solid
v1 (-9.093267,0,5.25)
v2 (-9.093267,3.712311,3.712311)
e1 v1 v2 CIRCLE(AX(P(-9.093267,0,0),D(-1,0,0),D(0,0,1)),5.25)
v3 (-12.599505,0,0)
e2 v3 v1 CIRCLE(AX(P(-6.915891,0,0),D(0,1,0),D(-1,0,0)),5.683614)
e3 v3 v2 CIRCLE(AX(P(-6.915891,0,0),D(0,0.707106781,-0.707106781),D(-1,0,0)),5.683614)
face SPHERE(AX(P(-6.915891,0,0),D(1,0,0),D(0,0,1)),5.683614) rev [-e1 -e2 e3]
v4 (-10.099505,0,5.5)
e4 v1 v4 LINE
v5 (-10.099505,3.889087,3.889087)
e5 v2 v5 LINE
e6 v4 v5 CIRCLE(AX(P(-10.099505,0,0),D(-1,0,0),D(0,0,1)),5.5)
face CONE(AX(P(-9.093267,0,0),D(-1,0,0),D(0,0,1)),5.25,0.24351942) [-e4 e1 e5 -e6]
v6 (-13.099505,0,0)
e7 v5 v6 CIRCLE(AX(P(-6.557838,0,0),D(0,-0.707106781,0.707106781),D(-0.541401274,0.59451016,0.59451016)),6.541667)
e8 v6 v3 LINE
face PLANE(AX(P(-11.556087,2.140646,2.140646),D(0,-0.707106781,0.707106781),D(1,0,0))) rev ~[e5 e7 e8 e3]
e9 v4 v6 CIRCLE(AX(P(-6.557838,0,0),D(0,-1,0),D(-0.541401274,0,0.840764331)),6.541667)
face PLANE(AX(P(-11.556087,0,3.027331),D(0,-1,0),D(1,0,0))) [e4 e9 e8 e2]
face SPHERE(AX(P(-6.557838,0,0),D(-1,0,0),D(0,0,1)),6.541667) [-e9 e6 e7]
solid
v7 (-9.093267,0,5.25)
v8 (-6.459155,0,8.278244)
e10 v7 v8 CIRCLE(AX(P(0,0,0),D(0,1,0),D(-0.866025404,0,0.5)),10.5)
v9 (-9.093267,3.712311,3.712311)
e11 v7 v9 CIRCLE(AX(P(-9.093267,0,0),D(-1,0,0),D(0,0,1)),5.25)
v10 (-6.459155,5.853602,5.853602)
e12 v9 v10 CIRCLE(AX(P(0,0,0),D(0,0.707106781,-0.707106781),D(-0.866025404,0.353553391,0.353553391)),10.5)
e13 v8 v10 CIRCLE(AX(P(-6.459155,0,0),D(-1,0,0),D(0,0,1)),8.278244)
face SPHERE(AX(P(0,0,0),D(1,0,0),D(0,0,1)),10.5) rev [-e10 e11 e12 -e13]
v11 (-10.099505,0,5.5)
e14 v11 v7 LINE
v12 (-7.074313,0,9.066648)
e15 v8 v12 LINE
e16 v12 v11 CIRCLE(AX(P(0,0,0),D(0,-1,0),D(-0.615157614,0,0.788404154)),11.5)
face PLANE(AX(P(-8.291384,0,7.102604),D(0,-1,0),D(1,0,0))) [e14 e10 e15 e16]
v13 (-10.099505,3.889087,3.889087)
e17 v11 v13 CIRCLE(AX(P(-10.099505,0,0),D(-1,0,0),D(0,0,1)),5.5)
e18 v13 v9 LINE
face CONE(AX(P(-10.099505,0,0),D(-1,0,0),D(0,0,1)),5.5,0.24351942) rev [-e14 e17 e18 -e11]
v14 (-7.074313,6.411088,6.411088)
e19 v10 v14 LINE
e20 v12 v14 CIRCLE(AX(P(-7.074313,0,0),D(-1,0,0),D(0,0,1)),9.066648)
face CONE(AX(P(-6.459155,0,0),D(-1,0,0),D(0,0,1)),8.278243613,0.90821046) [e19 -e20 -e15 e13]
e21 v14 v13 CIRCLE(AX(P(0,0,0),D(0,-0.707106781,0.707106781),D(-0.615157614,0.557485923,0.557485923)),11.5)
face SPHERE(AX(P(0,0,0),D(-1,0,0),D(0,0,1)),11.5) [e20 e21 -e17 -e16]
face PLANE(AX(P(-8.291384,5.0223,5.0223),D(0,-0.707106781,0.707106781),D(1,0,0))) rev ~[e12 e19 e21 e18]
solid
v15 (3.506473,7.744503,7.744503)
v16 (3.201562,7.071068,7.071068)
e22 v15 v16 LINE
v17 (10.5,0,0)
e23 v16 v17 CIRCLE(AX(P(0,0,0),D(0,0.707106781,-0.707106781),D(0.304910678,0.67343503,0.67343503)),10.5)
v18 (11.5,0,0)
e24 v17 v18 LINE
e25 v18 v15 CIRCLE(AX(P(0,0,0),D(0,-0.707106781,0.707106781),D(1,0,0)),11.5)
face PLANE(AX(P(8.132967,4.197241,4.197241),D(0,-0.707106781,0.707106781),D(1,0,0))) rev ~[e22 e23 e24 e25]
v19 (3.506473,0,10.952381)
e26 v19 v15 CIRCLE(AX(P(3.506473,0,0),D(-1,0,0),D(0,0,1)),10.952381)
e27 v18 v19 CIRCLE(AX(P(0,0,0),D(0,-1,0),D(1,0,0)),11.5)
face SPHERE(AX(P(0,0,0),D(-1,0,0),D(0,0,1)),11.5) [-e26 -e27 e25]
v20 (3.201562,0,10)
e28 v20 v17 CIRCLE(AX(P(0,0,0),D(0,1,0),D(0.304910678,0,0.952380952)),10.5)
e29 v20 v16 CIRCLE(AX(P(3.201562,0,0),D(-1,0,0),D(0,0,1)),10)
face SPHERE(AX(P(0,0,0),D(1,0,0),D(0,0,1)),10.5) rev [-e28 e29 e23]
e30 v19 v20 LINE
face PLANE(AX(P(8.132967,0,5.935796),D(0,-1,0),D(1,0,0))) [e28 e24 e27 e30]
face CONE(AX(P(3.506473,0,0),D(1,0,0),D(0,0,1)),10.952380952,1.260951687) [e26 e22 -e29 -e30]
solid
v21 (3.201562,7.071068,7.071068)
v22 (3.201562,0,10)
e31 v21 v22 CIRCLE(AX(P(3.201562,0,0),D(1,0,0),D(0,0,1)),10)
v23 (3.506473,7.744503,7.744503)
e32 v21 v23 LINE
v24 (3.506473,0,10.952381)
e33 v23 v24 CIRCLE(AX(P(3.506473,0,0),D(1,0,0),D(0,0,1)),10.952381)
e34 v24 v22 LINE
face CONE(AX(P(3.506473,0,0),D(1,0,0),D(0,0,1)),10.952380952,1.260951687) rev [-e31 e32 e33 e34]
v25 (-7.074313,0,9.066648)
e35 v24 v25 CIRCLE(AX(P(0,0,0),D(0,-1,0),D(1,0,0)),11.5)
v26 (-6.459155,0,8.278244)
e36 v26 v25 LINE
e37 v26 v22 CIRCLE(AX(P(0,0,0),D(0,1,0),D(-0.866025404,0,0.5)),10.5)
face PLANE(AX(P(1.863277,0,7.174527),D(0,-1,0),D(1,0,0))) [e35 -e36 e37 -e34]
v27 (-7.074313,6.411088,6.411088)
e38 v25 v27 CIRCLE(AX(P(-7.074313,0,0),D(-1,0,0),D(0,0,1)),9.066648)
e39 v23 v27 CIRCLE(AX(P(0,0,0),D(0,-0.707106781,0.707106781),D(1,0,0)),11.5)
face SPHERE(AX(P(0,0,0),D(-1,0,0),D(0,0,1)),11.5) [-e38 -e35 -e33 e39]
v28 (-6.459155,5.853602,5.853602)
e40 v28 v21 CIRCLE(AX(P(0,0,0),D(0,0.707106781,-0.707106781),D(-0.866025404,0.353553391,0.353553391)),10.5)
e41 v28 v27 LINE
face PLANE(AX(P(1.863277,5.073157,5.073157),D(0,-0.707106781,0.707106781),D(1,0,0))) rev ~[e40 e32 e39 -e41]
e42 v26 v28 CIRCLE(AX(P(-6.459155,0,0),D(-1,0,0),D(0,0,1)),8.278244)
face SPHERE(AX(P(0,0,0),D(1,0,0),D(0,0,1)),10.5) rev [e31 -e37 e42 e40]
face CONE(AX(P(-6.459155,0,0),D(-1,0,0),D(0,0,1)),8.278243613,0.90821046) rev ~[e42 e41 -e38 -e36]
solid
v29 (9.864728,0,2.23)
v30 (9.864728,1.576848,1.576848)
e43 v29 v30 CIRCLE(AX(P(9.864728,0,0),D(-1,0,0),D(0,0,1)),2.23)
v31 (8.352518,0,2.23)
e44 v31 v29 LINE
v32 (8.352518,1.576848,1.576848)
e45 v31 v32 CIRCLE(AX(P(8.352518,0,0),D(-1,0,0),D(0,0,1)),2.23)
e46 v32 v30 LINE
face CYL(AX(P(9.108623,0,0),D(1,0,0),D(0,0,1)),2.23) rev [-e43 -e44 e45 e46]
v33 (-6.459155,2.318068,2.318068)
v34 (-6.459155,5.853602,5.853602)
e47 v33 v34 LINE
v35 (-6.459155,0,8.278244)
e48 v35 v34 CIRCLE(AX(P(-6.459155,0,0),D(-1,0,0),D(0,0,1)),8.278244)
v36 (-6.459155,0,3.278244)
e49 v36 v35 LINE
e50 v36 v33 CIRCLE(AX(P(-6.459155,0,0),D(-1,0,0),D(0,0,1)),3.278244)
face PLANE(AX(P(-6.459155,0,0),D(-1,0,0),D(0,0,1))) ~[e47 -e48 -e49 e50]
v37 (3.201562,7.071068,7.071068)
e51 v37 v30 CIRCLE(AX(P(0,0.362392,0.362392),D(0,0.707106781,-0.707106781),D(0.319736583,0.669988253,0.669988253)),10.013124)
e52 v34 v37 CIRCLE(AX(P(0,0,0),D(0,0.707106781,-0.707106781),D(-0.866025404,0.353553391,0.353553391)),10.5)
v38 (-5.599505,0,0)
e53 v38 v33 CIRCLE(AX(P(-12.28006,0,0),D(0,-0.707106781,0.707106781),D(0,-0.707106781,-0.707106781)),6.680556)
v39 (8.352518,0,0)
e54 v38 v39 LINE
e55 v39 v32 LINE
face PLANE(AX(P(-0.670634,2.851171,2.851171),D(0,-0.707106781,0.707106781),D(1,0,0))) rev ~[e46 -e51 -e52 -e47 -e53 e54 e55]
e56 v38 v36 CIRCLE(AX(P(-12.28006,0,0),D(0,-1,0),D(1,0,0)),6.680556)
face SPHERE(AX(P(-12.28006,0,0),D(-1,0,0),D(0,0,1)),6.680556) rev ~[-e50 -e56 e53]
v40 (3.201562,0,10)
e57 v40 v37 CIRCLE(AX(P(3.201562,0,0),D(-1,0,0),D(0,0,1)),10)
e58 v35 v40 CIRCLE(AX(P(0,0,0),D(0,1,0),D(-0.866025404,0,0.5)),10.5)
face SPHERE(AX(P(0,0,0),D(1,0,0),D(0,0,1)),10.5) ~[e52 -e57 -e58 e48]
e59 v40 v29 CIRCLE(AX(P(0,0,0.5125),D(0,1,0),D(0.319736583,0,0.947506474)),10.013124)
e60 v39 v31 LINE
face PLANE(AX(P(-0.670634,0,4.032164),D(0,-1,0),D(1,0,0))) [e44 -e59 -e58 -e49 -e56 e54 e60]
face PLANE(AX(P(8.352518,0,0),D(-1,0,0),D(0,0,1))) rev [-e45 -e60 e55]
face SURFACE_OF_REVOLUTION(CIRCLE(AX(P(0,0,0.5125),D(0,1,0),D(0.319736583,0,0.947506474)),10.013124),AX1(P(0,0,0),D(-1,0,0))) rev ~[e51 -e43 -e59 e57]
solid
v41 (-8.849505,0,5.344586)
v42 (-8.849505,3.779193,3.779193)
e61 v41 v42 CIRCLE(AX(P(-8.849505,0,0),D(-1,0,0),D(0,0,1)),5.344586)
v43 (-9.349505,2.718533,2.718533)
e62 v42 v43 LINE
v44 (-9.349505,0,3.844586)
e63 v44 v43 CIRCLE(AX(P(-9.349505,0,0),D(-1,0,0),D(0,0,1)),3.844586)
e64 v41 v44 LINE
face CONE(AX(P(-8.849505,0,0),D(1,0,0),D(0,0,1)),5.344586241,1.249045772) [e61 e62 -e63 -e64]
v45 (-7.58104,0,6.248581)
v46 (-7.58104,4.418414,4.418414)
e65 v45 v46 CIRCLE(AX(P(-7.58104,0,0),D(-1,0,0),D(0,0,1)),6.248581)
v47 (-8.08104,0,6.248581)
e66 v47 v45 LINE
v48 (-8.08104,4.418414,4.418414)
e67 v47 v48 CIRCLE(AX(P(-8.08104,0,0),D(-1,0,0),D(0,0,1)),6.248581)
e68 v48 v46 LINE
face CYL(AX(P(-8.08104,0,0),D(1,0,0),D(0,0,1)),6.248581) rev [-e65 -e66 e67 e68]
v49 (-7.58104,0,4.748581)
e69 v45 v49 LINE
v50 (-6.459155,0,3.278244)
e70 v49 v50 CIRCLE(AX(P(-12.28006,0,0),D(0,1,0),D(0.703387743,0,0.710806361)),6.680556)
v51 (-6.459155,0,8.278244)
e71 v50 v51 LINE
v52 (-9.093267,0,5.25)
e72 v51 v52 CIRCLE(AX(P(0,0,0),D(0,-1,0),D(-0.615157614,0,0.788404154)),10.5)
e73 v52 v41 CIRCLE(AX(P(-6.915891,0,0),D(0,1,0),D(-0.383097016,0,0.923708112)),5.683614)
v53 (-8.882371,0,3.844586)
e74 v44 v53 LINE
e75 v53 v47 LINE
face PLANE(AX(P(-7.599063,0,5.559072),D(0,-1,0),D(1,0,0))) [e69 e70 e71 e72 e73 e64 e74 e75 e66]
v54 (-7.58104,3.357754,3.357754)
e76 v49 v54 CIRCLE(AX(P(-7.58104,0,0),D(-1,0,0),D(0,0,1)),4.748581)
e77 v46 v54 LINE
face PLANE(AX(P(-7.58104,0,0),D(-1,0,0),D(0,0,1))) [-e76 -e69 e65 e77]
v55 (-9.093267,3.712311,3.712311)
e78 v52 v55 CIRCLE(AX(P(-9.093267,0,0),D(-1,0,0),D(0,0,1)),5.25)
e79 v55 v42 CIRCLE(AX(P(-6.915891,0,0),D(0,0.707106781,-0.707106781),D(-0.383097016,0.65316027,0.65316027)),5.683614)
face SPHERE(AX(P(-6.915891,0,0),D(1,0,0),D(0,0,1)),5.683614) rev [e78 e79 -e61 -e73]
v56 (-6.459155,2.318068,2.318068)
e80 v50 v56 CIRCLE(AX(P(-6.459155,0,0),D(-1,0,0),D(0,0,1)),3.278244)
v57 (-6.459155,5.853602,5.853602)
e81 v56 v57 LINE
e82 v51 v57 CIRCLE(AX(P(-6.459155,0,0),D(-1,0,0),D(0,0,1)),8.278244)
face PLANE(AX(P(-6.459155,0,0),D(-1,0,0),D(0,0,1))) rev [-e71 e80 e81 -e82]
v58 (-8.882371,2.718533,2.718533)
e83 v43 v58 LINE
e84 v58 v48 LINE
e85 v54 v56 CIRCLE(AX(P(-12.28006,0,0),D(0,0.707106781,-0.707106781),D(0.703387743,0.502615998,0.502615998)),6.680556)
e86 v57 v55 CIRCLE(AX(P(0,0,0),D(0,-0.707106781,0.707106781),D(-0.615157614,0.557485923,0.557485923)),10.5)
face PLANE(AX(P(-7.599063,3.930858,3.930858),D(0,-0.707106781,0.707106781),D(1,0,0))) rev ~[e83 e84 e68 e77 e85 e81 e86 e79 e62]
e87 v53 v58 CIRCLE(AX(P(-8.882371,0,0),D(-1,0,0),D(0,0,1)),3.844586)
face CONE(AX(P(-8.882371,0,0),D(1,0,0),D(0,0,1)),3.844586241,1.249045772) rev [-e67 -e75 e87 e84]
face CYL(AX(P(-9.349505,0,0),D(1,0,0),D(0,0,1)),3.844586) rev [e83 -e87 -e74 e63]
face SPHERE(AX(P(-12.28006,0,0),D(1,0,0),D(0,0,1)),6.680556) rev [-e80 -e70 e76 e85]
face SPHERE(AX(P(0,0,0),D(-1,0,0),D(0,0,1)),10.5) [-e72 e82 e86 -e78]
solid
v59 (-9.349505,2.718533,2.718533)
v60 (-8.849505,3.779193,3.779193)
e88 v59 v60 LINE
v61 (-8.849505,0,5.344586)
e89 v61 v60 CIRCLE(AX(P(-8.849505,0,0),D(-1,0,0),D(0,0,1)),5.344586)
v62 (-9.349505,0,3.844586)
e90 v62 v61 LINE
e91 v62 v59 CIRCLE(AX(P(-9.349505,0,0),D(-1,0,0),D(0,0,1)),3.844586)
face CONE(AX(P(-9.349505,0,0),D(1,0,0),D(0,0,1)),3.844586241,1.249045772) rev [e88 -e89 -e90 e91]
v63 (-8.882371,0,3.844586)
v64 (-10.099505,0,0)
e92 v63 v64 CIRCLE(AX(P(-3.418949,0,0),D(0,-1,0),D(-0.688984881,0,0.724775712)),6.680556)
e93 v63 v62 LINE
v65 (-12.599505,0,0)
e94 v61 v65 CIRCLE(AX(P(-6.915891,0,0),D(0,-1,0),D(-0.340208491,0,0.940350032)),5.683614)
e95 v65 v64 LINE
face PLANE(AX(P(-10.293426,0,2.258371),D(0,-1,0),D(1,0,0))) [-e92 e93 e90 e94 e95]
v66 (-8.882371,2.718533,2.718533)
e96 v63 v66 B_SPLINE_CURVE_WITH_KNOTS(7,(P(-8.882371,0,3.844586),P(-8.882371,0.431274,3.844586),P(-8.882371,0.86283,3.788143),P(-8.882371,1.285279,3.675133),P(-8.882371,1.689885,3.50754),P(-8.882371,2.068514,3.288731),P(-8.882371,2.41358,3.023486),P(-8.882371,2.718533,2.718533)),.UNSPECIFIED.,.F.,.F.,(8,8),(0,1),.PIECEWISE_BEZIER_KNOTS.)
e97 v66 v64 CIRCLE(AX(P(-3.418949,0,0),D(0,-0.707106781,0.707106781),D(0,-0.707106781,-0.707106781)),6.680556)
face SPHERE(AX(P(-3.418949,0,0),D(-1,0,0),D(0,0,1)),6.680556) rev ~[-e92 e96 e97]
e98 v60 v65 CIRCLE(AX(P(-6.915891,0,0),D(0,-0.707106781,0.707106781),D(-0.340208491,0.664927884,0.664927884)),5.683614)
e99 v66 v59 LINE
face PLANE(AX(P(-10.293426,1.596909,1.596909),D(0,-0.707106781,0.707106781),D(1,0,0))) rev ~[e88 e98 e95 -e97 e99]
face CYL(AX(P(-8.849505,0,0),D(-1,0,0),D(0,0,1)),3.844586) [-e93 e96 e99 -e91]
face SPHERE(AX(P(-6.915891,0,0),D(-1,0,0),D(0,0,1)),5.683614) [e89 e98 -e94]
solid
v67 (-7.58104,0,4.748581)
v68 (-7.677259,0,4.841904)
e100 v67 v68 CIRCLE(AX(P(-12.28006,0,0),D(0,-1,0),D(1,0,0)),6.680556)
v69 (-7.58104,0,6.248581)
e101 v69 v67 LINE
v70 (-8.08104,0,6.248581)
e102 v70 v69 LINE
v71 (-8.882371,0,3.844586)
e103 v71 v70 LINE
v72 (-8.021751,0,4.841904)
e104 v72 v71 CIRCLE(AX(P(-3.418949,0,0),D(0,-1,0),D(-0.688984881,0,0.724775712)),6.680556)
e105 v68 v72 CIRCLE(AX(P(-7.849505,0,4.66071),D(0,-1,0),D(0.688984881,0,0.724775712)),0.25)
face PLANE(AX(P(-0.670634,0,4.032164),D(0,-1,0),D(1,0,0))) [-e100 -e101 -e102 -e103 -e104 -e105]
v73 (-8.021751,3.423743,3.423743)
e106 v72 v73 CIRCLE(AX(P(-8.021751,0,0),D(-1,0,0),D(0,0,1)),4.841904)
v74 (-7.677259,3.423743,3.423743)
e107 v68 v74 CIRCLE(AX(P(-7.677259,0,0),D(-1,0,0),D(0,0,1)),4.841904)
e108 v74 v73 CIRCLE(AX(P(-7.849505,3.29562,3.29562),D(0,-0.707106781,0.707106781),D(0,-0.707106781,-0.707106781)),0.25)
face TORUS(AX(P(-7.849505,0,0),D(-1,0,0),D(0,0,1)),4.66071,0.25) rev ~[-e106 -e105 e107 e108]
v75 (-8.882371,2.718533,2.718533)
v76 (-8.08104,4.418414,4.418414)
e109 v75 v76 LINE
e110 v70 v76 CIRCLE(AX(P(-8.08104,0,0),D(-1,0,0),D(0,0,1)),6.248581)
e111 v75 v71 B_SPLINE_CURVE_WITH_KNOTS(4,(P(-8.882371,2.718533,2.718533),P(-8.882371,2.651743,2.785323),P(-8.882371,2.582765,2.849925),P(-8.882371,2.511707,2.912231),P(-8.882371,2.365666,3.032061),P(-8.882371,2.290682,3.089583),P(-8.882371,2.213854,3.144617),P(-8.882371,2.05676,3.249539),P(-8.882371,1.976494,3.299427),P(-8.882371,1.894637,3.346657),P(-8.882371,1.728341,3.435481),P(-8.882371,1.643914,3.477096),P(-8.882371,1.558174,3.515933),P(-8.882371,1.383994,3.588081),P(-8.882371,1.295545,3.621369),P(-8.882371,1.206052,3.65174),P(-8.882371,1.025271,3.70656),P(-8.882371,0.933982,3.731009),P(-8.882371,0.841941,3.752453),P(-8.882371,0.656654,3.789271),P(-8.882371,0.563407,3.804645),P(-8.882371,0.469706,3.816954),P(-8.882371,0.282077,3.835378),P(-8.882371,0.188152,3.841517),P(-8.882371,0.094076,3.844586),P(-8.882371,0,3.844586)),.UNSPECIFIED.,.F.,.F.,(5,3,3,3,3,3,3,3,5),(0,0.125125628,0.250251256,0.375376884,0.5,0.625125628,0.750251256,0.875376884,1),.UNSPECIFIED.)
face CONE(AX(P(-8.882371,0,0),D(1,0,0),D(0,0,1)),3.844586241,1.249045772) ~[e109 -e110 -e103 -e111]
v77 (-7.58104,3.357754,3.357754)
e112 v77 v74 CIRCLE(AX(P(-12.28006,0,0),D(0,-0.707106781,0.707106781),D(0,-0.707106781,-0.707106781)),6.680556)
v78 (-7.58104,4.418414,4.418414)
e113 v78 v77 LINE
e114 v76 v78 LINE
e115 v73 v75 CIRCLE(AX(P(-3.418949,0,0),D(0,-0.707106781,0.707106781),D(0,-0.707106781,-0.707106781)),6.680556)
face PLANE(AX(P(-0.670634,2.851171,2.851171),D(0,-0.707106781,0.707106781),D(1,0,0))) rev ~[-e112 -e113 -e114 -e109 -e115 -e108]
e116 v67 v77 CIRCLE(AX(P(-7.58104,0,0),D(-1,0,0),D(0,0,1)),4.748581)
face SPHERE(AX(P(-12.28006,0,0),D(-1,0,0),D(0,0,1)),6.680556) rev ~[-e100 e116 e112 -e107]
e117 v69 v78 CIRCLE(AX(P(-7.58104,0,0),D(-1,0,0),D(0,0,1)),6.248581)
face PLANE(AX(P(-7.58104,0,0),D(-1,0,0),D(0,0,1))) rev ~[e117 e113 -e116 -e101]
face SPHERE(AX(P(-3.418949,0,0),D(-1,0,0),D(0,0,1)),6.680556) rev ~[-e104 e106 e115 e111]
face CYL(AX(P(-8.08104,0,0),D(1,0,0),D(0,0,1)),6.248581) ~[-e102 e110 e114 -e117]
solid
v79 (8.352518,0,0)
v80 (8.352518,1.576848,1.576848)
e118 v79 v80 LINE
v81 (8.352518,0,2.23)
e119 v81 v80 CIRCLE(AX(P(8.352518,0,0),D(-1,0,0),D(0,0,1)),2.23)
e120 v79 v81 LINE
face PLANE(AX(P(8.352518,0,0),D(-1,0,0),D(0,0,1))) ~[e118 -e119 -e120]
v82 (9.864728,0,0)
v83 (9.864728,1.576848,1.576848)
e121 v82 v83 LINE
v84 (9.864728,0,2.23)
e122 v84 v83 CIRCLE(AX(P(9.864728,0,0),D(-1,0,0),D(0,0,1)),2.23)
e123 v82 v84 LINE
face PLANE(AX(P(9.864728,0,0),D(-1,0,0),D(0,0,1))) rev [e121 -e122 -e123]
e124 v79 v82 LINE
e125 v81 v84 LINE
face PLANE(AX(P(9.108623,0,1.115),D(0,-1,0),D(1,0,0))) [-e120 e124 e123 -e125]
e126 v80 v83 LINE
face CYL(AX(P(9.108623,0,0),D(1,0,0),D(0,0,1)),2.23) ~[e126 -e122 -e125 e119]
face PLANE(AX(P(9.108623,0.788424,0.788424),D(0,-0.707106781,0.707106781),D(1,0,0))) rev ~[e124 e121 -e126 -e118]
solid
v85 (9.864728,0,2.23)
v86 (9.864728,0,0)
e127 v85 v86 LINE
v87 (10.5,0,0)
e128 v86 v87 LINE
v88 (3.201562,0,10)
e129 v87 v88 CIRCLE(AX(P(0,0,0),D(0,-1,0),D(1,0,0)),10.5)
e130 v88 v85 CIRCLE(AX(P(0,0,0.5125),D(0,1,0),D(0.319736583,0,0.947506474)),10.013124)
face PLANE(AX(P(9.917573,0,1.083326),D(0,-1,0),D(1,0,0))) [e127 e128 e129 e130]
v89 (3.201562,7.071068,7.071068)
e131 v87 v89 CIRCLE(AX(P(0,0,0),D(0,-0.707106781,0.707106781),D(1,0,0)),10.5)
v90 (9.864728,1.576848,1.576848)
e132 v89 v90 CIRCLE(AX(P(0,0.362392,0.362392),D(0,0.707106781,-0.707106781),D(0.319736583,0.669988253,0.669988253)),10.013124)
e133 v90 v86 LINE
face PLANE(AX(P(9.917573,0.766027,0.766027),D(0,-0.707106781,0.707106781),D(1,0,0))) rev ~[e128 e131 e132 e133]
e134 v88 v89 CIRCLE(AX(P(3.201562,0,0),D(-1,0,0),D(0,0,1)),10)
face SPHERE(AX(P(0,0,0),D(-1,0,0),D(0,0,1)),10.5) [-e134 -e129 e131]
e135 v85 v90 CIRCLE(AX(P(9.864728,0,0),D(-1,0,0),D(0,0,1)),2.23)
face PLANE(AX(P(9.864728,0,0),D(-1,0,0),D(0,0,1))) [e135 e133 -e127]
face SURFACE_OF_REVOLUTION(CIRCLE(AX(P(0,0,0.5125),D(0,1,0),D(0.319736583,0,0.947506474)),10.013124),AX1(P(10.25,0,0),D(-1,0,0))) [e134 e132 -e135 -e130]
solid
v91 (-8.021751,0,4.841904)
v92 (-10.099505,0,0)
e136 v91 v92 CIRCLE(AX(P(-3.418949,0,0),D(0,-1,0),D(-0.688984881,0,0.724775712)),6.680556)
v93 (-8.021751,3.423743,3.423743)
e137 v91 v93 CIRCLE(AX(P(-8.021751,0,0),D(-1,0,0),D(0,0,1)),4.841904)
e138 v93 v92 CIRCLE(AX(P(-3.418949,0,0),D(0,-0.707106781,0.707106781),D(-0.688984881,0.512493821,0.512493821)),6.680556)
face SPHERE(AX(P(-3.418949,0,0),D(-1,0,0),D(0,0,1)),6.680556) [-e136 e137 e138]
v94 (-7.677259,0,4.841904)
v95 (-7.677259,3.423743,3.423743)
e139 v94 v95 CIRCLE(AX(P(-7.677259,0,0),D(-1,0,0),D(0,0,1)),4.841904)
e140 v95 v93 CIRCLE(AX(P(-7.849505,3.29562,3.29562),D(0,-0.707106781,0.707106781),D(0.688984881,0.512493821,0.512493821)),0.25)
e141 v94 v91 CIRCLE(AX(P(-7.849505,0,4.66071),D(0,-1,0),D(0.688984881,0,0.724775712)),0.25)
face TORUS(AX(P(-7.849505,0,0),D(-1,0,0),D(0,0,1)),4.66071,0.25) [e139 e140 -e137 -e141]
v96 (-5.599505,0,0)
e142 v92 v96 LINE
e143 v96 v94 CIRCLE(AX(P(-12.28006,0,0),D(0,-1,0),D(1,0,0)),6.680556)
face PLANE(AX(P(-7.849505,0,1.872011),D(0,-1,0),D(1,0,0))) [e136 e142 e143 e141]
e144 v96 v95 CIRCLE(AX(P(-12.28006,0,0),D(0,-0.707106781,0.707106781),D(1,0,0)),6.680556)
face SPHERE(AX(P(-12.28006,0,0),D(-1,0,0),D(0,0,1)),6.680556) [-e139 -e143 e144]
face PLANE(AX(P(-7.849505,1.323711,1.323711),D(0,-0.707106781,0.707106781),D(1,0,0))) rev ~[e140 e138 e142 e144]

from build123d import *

# Parameters (mm, degrees)
F1_ANGLE  = 45
F3_ANGLE  = 45
F4_ANGLE  = 45
F6_ANGLE  = 45
F7_ANGLE  = 45
F9_ANGLE  = 45
F10_ANGLE = 45
F11_W     = 1.51221
F11_H     = 2.23
F12_ANGLE = 45
F13_ANGLE = 45
F15_ANGLE = 45
F16_ANGLE = 45
F19_ANGLE = 45
F22_ANGLE = 45
F25_ANGLE = 45
F28_ANGLE = 45
F31_ANGLE = 45


with BuildPart() as f1:
    # F0 (on Front) → F1 (revolve)
    with BuildSketch(Plane.XZ):
        with BuildLine():
            Line((-11.5, 0), (11.5, 0))
            ThreePointArc((11.5, 0), (2.8377537956, 11.1443776585), (-10.0995049384, 5.5))
            ThreePointArc((-10.0995049384, 5.5), (-12.3007384778, 3.1324910215), (-13.0995049384, 0))
            Line((-13.0995049384, 0), (-11.5, 0))
        make_face()
    revolve(axis=Axis((0, 0, 0), (-1, 0, 0)), revolution_arc=F1_ANGLE)

    # F2 (on Front) → F3 (revolve, cut)
    with BuildSketch(Plane.XZ):
        with BuildLine():
            ThreePointArc((11.5, 0), (2.8377537956, 11.1443776585), (-10.0995049384, 5.5))
            Line((-10.0995049384, 5.5), (-9.0932667397, 5.25))
            ThreePointArc((-9.0932667397, 5.25), (2.7175999736, 10.142221176), (10.5, 0))
            Line((10.5, 0), (11.5, 0))
        make_face()
    revolve(axis=Axis((0, 0, 0), (-1, 0, 0)), revolution_arc=F3_ANGLE, mode=Mode.SUBTRACT)

    # F5 (on face) → F6 (revolve, cut)
    with BuildSketch(Plane.XZ):
        with BuildLine():
            ThreePointArc((-12.5995049384, 0), (-11.6423500551, 3.1565885979), (-9.0932667397, 5.25))
            Line((-9.0932667397, 5.25), (-10.0995049384, 5.5))
            ThreePointArc((-10.0995049384, 5.5), (-12.3007384778, 3.1324910215), (-13.0995049384, 0))
            Line((-13.0995049384, 0), (-12.5995049384, 0))
        make_face()
    revolve(axis=Axis((-12.2997524692, 0, 0), (-1, 0, 0)), revolution_arc=F6_ANGLE, mode=Mode.SUBTRACT)

    # F8 (on Front) → F9 (revolve, cut)
    with BuildSketch(Plane.XZ):
        with BuildLine():
            ThreePointArc((3.2015621187, 10), (8.2807192075, 6.1420955145), (10, 0))
            Line((10, 0), (10.5, 0))
            ThreePointArc((10.5, 0), (8.4813442993, 6.1900564518), (3.2015621187, 10))
        make_face()
    revolve(axis=Axis((0, 0, 0), (-1, 0, 0)), revolution_arc=F9_ANGLE, mode=Mode.SUBTRACT)

    # F11 (on face) → F12 (revolve, cut)
    with BuildSketch(Plane.XZ):
        with Locations((9.1086225685, 1.115)):
            Rectangle(F11_W, F11_H)
    revolve(axis=Axis((9.1086225685, 0, 0), (-1, 0, 0)), revolution_arc=F12_ANGLE, mode=Mode.SUBTRACT)

    # F14 (on Front) → F15 (revolve, cut)
    with BuildSketch(Plane.XZ):
        with BuildLine():
            ThreePointArc((10, 0), (9.9947523902, 1.1187845105), (9.8647275685, 2.23))
            Line((9.8647275685, 2.23), (9.8647275685, 0))
            Line((9.8647275685, 0), (10, 0))
        make_face()
    revolve(axis=Axis((9.9323637842, 0, 0), (-1, 0, 0)), revolution_arc=F15_ANGLE, mode=Mode.SUBTRACT)

    # F20 (on Front) → F21 (revolve, cut)
    with BuildSketch(Plane.XZ):
        with BuildLine():
            Line((-9.3495049384, 3.8445862413), (-8.8495049384, 5.3445862413))
            ThreePointArc((-8.8495049384, 5.3445862413), (-11.5684914777, 3.2644717065), (-12.5995049384, 0))
            Line((-12.5995049384, 0), (-8.8495049384, 0))
            Line((-8.8495049384, 0), (-8.8495049384, 3.8445862413))
            Line((-8.8495049384, 3.8445862413), (-9.3495049384, 3.8445862413))
        make_face()
    revolve(axis=Axis((-10.7245049384, 0, 0), (1, 0, 0)), mode=Mode.SUBTRACT)


with BuildPart() as f4:
    # F2 (on Front) → F4 (revolve)
    with BuildSketch(Plane.XZ):
        with BuildLine():
            ThreePointArc((11.5, 0), (2.8377537956, 11.1443776585), (-10.0995049384, 5.5))
            Line((-10.0995049384, 5.5), (-9.0932667397, 5.25))
            ThreePointArc((-9.0932667397, 5.25), (2.7175999736, 10.142221176), (10.5, 0))
            Line((10.5, 0), (11.5, 0))
        make_face()
    revolve(axis=Axis((0, 0, 0), (-1, 0, 0)), revolution_arc=F4_ANGLE)

    # F17 (on Front) → F18 (revolve, cut)
    with BuildSketch(Plane.XZ):
        with BuildLine():
            ThreePointArc((11.5, 0), (9.2890913754, 6.7795856377), (3.5064727967, 10.9523809524))
            Line((3.5064727967, 10.9523809524), (3.2015621187, 10))
            ThreePointArc((3.2015621187, 10), (8.4813442993, 6.1900564518), (10.5, 0))
            Line((10.5, 0), (11.5, 0))
        make_face()
    revolve(axis=Axis((11, 0, 0), (1, 0, 0)), mode=Mode.SUBTRACT)

    # F29 (on Front) → F30 (revolve, cut)
    with BuildSketch(Plane.XZ):
        with BuildLine():
            ThreePointArc((-9.0932667397, 5.25), (-7.9222484154, 6.8911523017), (-6.4591549508, 8.2782436134))
            Line((-6.4591549508, 8.2782436134), (-7.0743125651, 9.066647767))
            ThreePointArc((-7.0743125651, 9.066647767), (-8.7701337495, 7.438733361), (-10.0995049384, 5.5))
            Line((-10.0995049384, 5.5), (-9.0932667397, 5.25))
        make_face()
    revolve(axis=Axis((-7.8495049384, 0, 0), (-1, 0, 0)), mode=Mode.SUBTRACT)


with BuildPart() as f7:
    # F5 (on face) → F7 (revolve)
    with BuildSketch(Plane.XZ):
        with BuildLine():
            ThreePointArc((-12.5995049384, 0), (-11.6423500551, 3.1565885979), (-9.0932667397, 5.25))
            Line((-9.0932667397, 5.25), (-10.0995049384, 5.5))
            ThreePointArc((-10.0995049384, 5.5), (-12.3007384778, 3.1324910215), (-13.0995049384, 0))
            Line((-13.0995049384, 0), (-12.5995049384, 0))
        make_face()
    revolve(axis=Axis((0, 0, 0), (-1, 0, 0)), revolution_arc=F7_ANGLE)


with BuildPart() as f10:
    # F8 (on Front) → F10 (revolve)
    with BuildSketch(Plane.XZ):
        with BuildLine():
            ThreePointArc((3.2015621187, 10), (8.2807192075, 6.1420955145), (10, 0))
            Line((10, 0), (10.5, 0))
            ThreePointArc((10.5, 0), (8.4813442993, 6.1900564518), (3.2015621187, 10))
        make_face()
    revolve(axis=Axis((10.25, 0, 0), (-1, 0, 0)), revolution_arc=F10_ANGLE)

    # F14 (on Front) → F16 (revolve)
    with BuildSketch(Plane.XZ):
        with BuildLine():
            ThreePointArc((10, 0), (9.9947523902, 1.1187845105), (9.8647275685, 2.23))
            Line((9.8647275685, 2.23), (9.8647275685, 0))
            Line((9.8647275685, 0), (10, 0))
        make_face()
    revolve(axis=Axis((0, 0, 0), (-1, 0, 0)), revolution_arc=F16_ANGLE)


with BuildPart() as f13:
    # F11 (on face) → F13 (revolve)
    with BuildSketch(Plane.XZ):
        with Locations((9.1086225685, 1.115)):
            Rectangle(F11_W, F11_H)
    revolve(axis=Axis((0, 0, 0), (-1, 0, 0)), revolution_arc=F13_ANGLE)


with BuildPart() as f19:
    # F17 (on Front) → F19 (revolve)
    with BuildSketch(Plane.XZ):
        with BuildLine():
            ThreePointArc((11.5, 0), (9.2890913754, 6.7795856377), (3.5064727967, 10.9523809524))
            Line((3.5064727967, 10.9523809524), (3.2015621187, 10))
            ThreePointArc((3.2015621187, 10), (8.4813442993, 6.1900564518), (10.5, 0))
            Line((10.5, 0), (11.5, 0))
        make_face()
    revolve(axis=Axis((0, 0, 0), (-1, 0, 0)), revolution_arc=F19_ANGLE)


with BuildPart() as f22:
    # F20 (on Front) → F22 (revolve)
    with BuildSketch(Plane.XZ):
        with BuildLine():
            Line((-9.3495049384, 3.8445862413), (-8.8495049384, 5.3445862413))
            ThreePointArc((-8.8495049384, 5.3445862413), (-11.5684914777, 3.2644717065), (-12.5995049384, 0))
            Line((-12.5995049384, 0), (-8.8495049384, 0))
            Line((-8.8495049384, 0), (-8.8495049384, 3.8445862413))
            Line((-8.8495049384, 3.8445862413), (-9.3495049384, 3.8445862413))
        make_face()
    revolve(axis=Axis((0, 0, 0), (-1, 0, 0)), revolution_arc=F22_ANGLE)


with BuildPart() as f24_tool:
    # F23 (on Front) → F24 (revolve)
    with BuildSketch(Plane.XZ):
        with BuildLine():
            Line((-10.0995049384, 0), (-5.5995049384, 0))
            ThreePointArc((-5.5995049384, 0), (-6.1408791354, 2.6344401261), (-7.6772587181, 4.8419044128))
            ThreePointArc((-7.6772587181, 4.8419044128), (-7.8495049384, 4.9107104847), (-8.0217511587, 4.8419044128))
            ThreePointArc((-8.0217511587, 4.8419044128), (-9.5581307413, 2.6344401261), (-10.0995049384, 0))
        make_face()
    revolve(axis=Axis((0, 0, 0), (-1, 0, 0)))


with BuildPart() as f1_1:
    add(f1.part)

    # F24: cut by f24_tool
    add(f24_tool.part, mode=Mode.SUBTRACT)

    # F26 (on Front) → F27 (revolve, cut)
    with BuildSketch(Plane.XZ):
        with BuildLine():
            Line((-8.8495049384, 5.3445862413), (-9.3495049384, 3.8445862413))
            Line((-9.3495049384, 3.8445862413), (-8.8823713109, 3.8445862413))
            Line((-8.8823713109, 3.8445862413), (-8.0810395972, 6.2485813822))
            Line((-8.0810395972, 6.2485813822), (-7.5810395972, 6.2485813822))
            Line((-7.5810395972, 6.2485813822), (-7.5810395972, 4.7485813822))
            ThreePointArc((-7.5810395972, 4.7485813822), (-6.9689696113, 4.0524234931), (-6.4591549508, 3.2782436134))
            Line((-6.4591549508, 3.2782436134), (-6.4591549508, 8.2782436134))
            ThreePointArc((-6.4591549508, 8.2782436134), (-7.9222484154, 6.8911523017), (-9.0932667397, 5.25))
            ThreePointArc((-9.0932667397, 5.25), (-8.9719298306, 5.298695062), (-8.8495049384, 5.3445862413))
        make_face()
    revolve(axis=Axis((-7.8495049384, 0, 0), (-1, 0, 0)), mode=Mode.SUBTRACT)


with BuildPart() as f22_1:
    add(f22.part)

    # F24: cut by f24_tool
    add(f24_tool.part, mode=Mode.SUBTRACT)


with BuildPart() as f25:
    # F23 (on Front) → F25 (revolve)
    with BuildSketch(Plane.XZ):
        with BuildLine():
            Line((-10.0995049384, 0), (-5.5995049384, 0))
            ThreePointArc((-5.5995049384, 0), (-6.1408791354, 2.6344401261), (-7.6772587181, 4.8419044128))
            ThreePointArc((-7.6772587181, 4.8419044128), (-7.8495049384, 4.9107104847), (-8.0217511587, 4.8419044128))
            ThreePointArc((-8.0217511587, 4.8419044128), (-9.5581307413, 2.6344401261), (-10.0995049384, 0))
        make_face()
    revolve(axis=Axis((0, 0, 0), (-1, 0, 0)), revolution_arc=F25_ANGLE)


with BuildPart() as f28:
    # F26 (on Front) → F28 (revolve)
    with BuildSketch(Plane.XZ):
        with BuildLine():
            Line((-8.8495049384, 5.3445862413), (-9.3495049384, 3.8445862413))
            Line((-9.3495049384, 3.8445862413), (-8.8823713109, 3.8445862413))
            Line((-8.8823713109, 3.8445862413), (-8.0810395972, 6.2485813822))
            Line((-8.0810395972, 6.2485813822), (-7.5810395972, 6.2485813822))
            Line((-7.5810395972, 6.2485813822), (-7.5810395972, 4.7485813822))
            ThreePointArc((-7.5810395972, 4.7485813822), (-6.9689696113, 4.0524234931), (-6.4591549508, 3.2782436134))
            Line((-6.4591549508, 3.2782436134), (-6.4591549508, 8.2782436134))
            ThreePointArc((-6.4591549508, 8.2782436134), (-7.9222484154, 6.8911523017), (-9.0932667397, 5.25))
            ThreePointArc((-9.0932667397, 5.25), (-8.9719298306, 5.298695062), (-8.8495049384, 5.3445862413))
        make_face()
    revolve(axis=Axis((-7.8495049384, 0, 0), (-1, 0, 0)), revolution_arc=F28_ANGLE)


with BuildPart() as f31:
    # F29 (on Front) → F31 (revolve)
    with BuildSketch(Plane.XZ):
        with BuildLine():
            ThreePointArc((-9.0932667397, 5.25), (-7.9222484154, 6.8911523017), (-6.4591549508, 8.2782436134))
            Line((-6.4591549508, 8.2782436134), (-7.0743125651, 9.066647767))
            ThreePointArc((-7.0743125651, 9.066647767), (-8.7701337495, 7.438733361), (-10.0995049384, 5.5))
            Line((-10.0995049384, 5.5), (-9.0932667397, 5.25))
        make_face()
    revolve(axis=Axis((-7.8495049384, 0, 0), (-1, 0, 0)), revolution_arc=F31_ANGLE)


solid = Compound([f4.part, f7.part, f10.part, f13.part, f19.part, f1_1.part, f22_1.part, f25.part, f28.part, f31.part])
